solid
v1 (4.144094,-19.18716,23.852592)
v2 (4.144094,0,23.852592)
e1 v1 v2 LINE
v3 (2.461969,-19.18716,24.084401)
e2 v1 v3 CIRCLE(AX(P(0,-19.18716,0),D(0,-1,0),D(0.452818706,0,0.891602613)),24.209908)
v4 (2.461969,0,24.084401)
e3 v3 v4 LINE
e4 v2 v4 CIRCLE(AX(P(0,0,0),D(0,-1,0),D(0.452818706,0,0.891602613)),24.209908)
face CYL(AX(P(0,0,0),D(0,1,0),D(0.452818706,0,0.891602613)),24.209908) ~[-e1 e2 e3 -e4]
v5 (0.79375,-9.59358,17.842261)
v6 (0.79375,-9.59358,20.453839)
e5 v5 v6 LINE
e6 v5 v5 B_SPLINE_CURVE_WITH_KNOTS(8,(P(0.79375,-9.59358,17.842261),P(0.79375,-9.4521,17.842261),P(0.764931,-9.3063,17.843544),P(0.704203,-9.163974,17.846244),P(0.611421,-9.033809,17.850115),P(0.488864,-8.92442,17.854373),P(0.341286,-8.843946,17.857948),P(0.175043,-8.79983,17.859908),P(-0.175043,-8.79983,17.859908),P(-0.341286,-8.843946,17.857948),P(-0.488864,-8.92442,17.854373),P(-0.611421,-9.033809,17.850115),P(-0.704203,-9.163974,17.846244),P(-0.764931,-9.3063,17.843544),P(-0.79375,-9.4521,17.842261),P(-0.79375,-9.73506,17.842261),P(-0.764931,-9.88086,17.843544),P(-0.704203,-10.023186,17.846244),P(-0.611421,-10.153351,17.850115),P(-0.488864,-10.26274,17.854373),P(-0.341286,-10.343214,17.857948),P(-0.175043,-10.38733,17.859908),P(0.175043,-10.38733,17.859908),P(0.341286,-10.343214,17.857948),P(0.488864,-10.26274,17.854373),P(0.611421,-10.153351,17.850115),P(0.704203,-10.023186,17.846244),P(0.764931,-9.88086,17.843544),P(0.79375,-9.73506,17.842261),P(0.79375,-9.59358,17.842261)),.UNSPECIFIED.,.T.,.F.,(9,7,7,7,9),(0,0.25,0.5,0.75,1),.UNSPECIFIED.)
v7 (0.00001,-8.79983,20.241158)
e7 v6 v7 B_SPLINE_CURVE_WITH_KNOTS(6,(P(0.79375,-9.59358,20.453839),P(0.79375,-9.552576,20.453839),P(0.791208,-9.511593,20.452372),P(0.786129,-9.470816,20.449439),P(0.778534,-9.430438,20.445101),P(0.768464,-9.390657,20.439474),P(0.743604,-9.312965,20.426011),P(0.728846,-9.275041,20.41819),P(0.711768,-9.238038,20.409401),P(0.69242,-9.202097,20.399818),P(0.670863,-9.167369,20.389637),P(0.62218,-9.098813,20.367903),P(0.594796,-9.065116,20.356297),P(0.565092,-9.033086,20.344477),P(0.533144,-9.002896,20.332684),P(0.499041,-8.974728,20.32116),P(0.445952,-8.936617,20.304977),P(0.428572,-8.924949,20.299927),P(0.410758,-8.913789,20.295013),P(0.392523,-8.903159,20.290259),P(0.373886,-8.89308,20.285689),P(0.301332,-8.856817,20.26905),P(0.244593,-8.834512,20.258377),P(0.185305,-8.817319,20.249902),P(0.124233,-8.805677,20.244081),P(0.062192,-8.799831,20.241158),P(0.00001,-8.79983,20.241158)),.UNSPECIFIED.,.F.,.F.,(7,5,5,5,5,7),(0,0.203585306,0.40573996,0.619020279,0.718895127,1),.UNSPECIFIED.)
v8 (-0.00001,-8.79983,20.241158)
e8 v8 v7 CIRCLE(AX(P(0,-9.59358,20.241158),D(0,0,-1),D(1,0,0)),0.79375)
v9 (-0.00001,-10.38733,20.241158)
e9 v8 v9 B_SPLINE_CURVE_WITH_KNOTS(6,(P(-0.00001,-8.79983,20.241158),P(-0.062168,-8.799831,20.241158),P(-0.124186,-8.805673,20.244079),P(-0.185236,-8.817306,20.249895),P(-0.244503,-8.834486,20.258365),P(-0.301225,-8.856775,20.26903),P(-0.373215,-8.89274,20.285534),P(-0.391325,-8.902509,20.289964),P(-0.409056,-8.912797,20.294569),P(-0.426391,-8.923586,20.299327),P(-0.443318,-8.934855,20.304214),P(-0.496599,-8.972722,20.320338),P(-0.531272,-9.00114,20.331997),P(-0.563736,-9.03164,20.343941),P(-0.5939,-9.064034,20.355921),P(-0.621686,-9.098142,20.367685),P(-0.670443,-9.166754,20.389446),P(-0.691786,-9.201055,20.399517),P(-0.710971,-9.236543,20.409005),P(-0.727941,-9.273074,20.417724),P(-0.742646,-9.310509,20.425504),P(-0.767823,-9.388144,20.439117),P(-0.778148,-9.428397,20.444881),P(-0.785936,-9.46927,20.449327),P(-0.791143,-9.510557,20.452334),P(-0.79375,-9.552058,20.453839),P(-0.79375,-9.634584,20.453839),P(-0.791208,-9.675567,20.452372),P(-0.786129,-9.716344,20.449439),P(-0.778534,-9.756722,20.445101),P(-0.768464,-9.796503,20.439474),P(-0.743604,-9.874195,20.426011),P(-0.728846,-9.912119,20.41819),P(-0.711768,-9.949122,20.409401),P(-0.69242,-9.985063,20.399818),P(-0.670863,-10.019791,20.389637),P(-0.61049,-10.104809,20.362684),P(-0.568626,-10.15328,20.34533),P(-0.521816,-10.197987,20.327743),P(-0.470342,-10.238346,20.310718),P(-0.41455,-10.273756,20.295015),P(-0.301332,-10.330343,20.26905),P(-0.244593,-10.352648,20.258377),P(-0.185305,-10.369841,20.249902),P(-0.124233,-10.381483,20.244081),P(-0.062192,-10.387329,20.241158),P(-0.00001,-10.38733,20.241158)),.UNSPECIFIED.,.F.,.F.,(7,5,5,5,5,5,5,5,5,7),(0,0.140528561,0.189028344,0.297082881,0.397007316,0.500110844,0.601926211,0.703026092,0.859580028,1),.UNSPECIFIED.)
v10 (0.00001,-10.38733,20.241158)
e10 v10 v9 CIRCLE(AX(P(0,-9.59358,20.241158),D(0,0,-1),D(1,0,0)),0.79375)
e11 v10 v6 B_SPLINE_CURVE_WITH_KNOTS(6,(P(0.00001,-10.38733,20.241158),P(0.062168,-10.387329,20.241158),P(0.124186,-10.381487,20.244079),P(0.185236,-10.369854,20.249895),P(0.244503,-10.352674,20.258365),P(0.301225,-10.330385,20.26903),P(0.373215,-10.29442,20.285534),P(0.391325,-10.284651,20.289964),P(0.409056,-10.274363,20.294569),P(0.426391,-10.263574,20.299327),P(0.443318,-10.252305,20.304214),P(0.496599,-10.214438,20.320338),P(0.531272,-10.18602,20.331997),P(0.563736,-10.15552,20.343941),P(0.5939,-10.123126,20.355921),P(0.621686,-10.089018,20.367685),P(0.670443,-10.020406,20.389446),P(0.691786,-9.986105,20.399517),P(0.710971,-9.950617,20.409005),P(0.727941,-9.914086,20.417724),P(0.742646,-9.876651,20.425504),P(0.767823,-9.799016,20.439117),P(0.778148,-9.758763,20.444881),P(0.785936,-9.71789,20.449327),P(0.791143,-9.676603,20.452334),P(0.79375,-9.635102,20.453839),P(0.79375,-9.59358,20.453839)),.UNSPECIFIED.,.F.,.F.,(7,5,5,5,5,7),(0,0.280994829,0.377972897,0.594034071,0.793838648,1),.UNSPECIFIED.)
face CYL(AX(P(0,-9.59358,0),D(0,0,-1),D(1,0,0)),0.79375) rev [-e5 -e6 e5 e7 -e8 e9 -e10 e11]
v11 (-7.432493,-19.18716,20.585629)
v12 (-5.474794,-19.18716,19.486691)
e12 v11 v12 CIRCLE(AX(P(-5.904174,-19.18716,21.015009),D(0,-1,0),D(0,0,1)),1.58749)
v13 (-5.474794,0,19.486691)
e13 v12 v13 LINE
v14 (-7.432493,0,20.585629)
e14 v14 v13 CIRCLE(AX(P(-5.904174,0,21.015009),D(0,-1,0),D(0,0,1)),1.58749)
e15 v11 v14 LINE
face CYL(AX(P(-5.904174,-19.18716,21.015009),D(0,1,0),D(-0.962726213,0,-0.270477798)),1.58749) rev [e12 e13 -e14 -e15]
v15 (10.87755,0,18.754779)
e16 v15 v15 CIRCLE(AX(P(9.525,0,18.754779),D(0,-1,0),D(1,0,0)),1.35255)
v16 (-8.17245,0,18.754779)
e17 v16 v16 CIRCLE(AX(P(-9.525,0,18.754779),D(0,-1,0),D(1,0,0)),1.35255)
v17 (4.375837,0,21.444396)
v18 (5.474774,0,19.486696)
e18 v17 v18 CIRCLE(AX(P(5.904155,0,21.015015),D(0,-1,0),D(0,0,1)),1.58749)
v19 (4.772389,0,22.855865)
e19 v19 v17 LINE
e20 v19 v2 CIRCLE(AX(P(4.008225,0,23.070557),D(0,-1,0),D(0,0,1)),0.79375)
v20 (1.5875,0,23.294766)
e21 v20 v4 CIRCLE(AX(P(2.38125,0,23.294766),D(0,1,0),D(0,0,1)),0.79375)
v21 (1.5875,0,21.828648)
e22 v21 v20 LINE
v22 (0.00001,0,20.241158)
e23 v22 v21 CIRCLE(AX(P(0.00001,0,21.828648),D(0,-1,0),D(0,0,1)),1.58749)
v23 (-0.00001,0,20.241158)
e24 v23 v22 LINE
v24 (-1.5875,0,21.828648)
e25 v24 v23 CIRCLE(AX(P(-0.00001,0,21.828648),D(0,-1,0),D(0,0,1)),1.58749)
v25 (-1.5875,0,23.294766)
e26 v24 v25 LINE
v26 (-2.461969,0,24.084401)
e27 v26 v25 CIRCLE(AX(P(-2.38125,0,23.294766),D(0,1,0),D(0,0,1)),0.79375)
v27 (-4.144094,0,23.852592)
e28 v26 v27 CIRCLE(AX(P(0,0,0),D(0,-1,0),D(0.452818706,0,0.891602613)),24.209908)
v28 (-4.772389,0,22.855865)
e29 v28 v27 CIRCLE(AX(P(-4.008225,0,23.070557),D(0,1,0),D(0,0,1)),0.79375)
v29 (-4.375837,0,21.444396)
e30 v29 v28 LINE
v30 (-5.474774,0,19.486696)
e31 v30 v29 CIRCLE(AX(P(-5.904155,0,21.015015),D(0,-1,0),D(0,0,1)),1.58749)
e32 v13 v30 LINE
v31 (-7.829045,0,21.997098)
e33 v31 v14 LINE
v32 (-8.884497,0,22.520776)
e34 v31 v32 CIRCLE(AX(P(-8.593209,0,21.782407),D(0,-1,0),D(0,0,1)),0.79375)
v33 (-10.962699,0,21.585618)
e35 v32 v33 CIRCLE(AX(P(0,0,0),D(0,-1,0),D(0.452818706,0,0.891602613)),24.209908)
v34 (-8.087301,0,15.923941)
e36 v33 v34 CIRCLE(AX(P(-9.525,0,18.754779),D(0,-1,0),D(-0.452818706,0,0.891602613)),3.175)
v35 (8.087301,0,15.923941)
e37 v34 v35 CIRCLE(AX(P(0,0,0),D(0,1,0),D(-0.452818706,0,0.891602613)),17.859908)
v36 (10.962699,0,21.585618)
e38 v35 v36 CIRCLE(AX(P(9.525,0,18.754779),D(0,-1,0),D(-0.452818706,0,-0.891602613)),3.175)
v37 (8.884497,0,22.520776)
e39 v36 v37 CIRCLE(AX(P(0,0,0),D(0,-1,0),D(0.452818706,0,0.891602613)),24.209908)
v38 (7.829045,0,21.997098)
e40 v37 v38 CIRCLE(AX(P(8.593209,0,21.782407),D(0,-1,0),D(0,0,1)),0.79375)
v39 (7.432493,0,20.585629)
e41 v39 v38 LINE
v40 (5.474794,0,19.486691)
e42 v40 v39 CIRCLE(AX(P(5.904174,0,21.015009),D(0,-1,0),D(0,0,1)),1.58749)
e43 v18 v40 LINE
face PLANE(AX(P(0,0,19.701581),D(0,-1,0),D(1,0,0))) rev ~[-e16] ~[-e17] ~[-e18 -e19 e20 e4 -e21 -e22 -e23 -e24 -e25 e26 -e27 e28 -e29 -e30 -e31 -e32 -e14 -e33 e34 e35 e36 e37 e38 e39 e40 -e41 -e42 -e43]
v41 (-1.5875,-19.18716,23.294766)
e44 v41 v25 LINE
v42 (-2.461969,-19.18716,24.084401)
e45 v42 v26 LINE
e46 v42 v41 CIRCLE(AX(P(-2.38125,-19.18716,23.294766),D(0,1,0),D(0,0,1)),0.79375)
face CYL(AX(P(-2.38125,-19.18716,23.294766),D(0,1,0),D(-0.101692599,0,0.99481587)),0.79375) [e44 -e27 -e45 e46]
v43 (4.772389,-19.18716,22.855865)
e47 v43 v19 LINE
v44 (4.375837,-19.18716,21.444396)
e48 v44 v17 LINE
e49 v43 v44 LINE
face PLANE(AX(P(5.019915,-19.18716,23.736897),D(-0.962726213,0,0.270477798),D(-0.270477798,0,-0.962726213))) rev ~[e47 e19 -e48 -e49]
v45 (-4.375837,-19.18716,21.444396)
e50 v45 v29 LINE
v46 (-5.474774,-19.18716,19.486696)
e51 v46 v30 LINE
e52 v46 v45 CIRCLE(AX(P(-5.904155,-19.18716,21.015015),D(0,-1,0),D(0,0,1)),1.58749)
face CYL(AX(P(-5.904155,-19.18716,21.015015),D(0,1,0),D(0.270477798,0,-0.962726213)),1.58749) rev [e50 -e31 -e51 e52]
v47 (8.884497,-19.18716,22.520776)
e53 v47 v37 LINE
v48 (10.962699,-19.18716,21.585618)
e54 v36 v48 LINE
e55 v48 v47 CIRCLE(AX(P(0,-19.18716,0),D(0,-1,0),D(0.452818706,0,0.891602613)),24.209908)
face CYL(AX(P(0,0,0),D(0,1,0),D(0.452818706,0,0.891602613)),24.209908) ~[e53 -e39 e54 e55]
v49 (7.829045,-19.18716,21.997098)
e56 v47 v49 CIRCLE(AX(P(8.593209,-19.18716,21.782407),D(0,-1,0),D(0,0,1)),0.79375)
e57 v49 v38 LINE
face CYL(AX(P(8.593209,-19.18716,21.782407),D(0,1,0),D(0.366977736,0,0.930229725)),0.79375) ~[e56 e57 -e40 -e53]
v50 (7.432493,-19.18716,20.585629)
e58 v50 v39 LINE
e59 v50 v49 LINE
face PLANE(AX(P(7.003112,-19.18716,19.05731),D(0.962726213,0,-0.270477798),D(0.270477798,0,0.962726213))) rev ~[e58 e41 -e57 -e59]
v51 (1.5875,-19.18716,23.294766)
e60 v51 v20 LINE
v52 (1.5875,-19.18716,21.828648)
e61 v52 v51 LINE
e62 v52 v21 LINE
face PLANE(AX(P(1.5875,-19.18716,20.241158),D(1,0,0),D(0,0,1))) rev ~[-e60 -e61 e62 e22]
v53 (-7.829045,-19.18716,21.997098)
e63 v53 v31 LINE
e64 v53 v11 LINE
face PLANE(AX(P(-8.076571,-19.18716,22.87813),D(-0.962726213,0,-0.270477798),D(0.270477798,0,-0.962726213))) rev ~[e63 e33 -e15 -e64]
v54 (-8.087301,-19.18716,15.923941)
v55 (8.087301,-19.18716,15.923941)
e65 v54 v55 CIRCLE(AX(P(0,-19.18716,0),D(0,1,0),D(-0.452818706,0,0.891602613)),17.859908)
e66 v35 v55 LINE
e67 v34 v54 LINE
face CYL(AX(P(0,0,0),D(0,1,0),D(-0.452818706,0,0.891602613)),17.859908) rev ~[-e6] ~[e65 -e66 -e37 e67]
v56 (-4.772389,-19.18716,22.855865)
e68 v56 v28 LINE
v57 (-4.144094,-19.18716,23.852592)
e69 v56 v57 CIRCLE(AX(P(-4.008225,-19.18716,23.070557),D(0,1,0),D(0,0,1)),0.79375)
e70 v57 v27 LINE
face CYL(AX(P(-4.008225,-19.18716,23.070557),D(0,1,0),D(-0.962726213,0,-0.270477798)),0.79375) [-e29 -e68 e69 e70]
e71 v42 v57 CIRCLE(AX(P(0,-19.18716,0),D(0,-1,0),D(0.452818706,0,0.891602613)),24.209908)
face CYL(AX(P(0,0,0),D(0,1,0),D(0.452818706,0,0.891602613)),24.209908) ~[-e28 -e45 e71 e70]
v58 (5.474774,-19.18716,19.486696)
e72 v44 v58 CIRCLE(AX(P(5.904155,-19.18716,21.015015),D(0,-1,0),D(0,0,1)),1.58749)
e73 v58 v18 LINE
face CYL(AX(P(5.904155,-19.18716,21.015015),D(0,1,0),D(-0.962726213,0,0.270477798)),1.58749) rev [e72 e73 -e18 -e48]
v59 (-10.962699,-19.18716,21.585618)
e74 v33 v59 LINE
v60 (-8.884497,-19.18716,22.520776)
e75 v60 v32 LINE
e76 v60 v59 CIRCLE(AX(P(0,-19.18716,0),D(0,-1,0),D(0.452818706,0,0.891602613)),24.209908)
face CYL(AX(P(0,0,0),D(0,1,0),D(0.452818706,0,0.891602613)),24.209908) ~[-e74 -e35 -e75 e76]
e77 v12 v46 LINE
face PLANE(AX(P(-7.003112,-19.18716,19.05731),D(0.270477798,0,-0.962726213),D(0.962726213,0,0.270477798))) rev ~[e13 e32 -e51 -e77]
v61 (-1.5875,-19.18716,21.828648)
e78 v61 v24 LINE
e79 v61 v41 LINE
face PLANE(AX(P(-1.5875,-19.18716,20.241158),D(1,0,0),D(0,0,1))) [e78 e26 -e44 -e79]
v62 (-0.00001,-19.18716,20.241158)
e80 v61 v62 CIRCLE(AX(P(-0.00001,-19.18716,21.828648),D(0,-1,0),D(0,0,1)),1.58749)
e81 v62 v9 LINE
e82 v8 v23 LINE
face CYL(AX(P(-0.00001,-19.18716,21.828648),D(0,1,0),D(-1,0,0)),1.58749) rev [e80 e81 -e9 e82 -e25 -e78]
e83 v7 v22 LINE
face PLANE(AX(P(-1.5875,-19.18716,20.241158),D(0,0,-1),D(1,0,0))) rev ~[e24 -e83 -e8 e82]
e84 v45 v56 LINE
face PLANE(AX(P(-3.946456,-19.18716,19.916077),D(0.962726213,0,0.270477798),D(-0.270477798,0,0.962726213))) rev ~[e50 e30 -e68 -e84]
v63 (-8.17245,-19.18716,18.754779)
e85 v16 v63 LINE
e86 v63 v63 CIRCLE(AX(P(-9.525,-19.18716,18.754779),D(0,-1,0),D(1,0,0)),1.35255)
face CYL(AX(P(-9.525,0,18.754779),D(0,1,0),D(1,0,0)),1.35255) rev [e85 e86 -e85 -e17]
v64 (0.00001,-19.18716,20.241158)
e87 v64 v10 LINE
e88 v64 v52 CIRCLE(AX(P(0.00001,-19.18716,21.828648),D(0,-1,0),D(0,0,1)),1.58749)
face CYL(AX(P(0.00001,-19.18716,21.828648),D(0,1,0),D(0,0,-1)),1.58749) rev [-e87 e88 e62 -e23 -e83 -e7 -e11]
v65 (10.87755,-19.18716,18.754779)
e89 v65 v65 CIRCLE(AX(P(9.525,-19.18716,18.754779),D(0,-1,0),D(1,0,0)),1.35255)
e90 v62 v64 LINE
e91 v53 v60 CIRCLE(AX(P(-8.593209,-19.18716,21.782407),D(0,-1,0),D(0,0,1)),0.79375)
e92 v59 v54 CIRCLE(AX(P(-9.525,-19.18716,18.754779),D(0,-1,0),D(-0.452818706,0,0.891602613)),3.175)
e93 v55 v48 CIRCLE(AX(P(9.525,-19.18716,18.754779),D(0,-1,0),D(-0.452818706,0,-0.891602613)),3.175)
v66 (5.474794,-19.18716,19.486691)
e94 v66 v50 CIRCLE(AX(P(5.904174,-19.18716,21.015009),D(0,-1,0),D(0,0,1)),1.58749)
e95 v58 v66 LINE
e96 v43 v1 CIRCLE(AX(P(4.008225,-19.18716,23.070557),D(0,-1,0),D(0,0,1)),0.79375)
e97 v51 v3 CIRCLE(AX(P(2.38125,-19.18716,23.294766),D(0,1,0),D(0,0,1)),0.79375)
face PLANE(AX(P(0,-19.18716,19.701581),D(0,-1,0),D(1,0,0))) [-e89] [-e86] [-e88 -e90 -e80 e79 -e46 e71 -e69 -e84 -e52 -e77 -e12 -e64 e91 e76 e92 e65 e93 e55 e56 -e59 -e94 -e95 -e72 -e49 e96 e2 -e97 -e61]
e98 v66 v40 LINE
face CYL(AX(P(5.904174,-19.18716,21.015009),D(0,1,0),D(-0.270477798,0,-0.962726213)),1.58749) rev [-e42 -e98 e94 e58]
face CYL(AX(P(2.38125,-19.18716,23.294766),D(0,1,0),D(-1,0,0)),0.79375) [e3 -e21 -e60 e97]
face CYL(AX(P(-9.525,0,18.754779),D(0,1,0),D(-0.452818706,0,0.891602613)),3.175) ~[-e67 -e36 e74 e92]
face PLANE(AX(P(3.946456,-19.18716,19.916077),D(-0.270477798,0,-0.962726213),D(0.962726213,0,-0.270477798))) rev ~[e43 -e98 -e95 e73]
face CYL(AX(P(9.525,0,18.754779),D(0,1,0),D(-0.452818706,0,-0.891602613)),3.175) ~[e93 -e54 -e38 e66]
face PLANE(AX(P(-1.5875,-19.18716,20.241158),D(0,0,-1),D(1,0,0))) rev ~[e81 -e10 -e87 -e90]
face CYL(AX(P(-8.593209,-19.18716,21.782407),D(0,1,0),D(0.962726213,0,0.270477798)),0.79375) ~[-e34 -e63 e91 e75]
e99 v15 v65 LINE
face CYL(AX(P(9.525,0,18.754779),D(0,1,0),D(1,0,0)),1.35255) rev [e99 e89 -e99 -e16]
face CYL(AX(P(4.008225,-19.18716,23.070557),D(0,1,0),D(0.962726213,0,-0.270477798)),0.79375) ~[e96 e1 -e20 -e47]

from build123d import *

# Parameters (mm, degrees)
F0_R     = 1.35255
F1_DEPTH = 19.18716
F2_W     = 3.175
F2_H     = 3.96875
F3_DEPTH = 19.18716
F4_R     = 1.58749
F5_R     = 0.79375
F6_R     = 0.79375
F7_DEPTH = 55


# Not quite as in the source:
# - a fillet or chamfer is up to 0.001 mm smaller than in the source, because OpenCascade refuses the exact size
# - an extrude ends at something that could not be found from the text; its depth is read off the source's solid


with BuildPart() as f1:
    # F0 (on Front) → F1 (new body)
    with BuildSketch(Plane.XZ):
        with BuildLine():
            ThreePointArc((-8.0873006088, 15.9239409983), (0, 17.8599084), (8.0873006088, 15.9239409983))
            ThreePointArc((8.0873006088, 15.9239409983), (12.3558382964, 17.3170799036), (10.9626993912, 21.5856175912))
            ThreePointArc((10.9626993912, 21.5856175912), (0, 24.2099084), (-10.9626993912, 21.5856175912))
            ThreePointArc((-10.9626993912, 21.5856175912), (-12.3558382964, 17.3170799036), (-8.0873006088, 15.9239409983))
        make_face()
        with Locations((-9.525, 18.7547792948)):
            Circle(F0_R, mode=Mode.SUBTRACT)
        with Locations((9.525, 18.7547792948)):
            Circle(F0_R, mode=Mode.SUBTRACT)
    extrude(amount=F1_DEPTH)

    # F2 (on face) → F3 (cut, through all)
    with BuildSketch(Plane.XZ.offset(19.18716)):
        Polygon((-8.0765705738, 22.8781299226), (-7.0031118134, 19.0573102654), (-3.9464560877, 19.9160772737), (-5.0199148481, 23.7368969308), align=None)
        Polygon((8.0765705738, 22.8781299226), (5.0199148481, 23.7368969308), (3.9464560877, 19.9160772737), (7.0031118134, 19.0573102654), align=None)
        with Locations((0, 22.2255334)):
            Rectangle(F2_W, F2_H)
    extrude(amount=-F3_DEPTH, mode=Mode.SUBTRACT)

    # F4 (radius 1.5875 in the source; OpenCascade refuses exactly that, so slightly less here)
    f4_edges = [f1.edges().sort_by_distance(p)[0] for p in [
        (-7.003112, -9.59358, 19.05731),
        (-3.946456, -9.59358, 19.916077),
        (-1.5875, -9.59358, 20.241158),
        (1.5875, -9.59358, 20.241158),
        (3.946456, -9.59358, 19.916077),
        (7.003112, -9.59358, 19.05731),
    ]]
    fillet(f4_edges, radius=F4_R)

    # F5
    f5_edges = [f1.edges().sort_by_distance(p)[0] for p in [
        (-8.062478, -9.59358, 22.827968),
        (-5.005822, -9.59358, 23.686735),
        (-1.5875, -9.59358, 24.157804),
        (1.5875, -9.59358, 24.157804),
        (5.005822, -9.59358, 23.686735),
        (8.062478, -9.59358, 22.827968),
    ]]
    fillet(f5_edges, radius=F5_R)

    # F6 (on Top) → F7 (cut, through all)
    with BuildSketch(Plane.XY):
        with Locations((0, -9.59358)):
            Circle(F6_R)
    extrude(amount=F7_DEPTH, mode=Mode.SUBTRACT)


solid = f1.part
